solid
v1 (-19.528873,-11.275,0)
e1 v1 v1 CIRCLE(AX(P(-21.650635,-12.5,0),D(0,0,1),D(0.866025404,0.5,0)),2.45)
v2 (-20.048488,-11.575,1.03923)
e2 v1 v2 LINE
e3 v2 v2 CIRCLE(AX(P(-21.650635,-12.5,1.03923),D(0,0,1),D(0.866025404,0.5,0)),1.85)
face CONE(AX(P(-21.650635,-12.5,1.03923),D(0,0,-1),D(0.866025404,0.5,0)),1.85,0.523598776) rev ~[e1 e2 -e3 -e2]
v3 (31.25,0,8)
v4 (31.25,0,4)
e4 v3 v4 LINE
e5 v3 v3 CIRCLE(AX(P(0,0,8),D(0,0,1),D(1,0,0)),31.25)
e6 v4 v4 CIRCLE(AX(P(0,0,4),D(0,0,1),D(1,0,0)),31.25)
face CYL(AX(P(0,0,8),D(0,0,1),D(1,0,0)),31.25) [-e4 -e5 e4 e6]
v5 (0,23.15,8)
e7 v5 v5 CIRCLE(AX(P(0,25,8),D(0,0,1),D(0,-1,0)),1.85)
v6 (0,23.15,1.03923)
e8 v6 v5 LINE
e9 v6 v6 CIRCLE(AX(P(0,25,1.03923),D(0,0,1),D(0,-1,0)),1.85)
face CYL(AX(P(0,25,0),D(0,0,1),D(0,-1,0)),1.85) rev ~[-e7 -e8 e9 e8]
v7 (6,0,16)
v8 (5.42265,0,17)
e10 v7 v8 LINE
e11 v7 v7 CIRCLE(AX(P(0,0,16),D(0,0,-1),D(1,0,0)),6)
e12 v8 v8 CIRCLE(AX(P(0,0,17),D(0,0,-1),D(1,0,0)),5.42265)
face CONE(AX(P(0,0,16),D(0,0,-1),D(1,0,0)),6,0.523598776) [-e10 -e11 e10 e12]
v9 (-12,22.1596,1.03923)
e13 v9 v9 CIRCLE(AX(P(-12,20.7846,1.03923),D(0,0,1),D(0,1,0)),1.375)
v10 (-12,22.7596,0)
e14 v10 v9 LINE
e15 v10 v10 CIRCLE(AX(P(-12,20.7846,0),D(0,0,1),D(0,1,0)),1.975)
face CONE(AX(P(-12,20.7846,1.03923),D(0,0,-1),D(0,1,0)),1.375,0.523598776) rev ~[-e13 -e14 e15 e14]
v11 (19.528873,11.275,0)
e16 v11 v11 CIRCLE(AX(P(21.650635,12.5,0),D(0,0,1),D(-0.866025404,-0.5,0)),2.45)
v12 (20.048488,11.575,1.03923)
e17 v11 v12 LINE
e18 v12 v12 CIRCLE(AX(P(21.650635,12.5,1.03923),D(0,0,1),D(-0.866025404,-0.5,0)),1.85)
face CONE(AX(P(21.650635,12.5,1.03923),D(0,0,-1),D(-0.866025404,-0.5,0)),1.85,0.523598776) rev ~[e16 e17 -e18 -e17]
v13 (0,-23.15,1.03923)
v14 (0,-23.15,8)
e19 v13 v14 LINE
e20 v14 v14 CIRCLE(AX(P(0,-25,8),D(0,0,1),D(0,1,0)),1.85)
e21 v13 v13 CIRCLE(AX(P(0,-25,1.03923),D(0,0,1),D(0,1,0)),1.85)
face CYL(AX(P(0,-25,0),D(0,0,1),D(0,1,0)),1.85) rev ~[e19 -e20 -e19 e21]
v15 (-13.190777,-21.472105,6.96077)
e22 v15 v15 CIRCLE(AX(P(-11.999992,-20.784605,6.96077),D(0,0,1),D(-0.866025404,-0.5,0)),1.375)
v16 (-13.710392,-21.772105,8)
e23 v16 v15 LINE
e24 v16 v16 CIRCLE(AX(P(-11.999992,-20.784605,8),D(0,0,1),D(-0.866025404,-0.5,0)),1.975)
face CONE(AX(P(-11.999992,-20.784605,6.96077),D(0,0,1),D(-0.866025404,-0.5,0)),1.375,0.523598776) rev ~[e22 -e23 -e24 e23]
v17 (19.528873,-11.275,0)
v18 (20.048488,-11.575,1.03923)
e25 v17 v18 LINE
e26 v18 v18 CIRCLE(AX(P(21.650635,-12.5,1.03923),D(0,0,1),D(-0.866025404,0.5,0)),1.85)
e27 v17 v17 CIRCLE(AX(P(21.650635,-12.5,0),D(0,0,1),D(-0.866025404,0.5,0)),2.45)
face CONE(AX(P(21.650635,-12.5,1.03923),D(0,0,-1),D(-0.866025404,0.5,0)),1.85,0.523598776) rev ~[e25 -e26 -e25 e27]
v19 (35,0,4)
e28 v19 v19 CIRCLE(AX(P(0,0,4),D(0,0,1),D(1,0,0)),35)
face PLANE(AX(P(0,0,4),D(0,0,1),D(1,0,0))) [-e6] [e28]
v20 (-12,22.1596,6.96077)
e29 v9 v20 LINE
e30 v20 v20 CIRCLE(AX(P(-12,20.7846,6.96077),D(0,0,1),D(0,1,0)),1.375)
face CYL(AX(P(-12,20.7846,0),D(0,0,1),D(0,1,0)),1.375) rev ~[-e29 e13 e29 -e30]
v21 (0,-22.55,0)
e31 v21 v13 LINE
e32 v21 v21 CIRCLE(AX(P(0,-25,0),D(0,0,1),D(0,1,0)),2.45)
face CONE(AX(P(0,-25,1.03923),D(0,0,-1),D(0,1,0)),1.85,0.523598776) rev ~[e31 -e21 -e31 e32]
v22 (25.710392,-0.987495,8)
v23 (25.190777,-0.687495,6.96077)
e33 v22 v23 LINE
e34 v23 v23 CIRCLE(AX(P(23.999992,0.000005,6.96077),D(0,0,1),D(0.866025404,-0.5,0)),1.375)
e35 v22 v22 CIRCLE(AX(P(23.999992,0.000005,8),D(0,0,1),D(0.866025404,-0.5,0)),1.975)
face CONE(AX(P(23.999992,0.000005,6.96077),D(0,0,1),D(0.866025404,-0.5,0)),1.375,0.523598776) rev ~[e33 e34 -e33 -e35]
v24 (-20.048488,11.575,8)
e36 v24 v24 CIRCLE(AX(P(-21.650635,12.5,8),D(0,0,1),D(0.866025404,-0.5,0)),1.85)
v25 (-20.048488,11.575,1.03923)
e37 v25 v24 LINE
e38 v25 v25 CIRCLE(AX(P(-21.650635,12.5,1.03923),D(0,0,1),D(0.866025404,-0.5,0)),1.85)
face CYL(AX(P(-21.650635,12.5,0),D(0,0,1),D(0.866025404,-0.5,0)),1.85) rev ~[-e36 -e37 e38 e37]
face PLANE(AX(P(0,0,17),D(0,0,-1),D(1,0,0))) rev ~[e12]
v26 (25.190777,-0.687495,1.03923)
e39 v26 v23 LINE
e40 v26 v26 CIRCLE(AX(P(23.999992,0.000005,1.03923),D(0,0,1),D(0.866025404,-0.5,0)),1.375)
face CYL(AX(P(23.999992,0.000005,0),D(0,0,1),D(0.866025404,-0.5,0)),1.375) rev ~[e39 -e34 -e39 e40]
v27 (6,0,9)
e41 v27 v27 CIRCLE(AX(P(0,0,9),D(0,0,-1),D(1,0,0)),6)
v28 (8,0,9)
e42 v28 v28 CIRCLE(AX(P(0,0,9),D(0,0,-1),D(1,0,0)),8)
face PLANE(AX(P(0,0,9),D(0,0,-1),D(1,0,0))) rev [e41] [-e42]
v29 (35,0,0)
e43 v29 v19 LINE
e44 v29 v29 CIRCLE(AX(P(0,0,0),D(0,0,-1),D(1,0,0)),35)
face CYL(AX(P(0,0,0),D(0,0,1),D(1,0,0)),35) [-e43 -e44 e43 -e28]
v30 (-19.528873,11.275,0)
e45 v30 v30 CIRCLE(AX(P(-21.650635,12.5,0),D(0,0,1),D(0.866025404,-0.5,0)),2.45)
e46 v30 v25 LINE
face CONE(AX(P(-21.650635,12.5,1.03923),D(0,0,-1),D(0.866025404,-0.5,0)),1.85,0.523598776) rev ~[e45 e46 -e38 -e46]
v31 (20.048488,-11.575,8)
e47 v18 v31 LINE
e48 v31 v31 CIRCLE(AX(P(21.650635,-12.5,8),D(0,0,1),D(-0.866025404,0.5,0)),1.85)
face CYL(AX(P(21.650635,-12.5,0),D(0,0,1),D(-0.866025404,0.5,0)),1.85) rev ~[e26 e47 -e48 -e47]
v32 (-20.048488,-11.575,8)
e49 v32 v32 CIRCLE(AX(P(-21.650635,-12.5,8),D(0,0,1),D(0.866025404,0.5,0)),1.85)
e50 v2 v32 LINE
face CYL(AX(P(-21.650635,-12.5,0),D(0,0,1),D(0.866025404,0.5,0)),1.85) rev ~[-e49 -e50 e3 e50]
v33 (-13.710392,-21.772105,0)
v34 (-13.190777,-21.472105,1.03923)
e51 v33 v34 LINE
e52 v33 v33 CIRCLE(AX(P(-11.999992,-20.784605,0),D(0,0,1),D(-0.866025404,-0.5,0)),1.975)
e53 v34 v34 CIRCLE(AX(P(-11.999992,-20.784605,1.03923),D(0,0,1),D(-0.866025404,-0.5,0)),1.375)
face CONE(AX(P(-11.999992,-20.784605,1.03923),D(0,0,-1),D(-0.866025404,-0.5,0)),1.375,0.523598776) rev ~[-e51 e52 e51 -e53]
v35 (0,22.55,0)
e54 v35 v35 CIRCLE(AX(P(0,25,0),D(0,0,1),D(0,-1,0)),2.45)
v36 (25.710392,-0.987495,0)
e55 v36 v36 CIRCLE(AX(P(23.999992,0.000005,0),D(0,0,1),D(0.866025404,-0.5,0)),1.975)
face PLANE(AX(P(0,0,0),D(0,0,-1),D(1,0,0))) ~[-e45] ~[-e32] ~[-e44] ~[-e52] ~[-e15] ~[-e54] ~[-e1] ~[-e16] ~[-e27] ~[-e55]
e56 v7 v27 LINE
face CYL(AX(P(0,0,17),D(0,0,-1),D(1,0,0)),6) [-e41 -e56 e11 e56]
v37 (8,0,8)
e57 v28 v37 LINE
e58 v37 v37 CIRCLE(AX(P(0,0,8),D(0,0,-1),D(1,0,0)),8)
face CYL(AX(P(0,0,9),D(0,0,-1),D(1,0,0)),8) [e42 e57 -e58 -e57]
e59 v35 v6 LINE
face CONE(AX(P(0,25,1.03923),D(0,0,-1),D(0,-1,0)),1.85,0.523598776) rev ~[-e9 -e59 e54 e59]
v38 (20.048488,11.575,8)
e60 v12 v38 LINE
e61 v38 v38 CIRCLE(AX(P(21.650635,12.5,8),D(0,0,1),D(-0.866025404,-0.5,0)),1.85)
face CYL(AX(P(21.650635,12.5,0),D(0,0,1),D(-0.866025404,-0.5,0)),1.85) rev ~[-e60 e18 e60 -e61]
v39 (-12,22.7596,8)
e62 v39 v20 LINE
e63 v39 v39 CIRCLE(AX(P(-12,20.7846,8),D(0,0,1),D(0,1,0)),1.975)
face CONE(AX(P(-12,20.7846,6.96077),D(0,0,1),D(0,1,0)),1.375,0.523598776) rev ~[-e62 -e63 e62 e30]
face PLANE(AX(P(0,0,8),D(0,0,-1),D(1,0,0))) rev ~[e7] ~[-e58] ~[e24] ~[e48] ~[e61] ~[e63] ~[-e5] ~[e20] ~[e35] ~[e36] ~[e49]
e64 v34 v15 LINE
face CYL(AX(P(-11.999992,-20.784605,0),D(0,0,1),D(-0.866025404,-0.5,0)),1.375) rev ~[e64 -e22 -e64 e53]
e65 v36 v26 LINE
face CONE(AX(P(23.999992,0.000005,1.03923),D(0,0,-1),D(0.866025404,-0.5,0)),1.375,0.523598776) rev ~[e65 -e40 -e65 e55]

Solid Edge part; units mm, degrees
sketch "Sketch1" plane through (0, 0, 0) normal (0, -1, 0) x (1, 0, 0)
  line L0 (35, 0) -> (35, 8)
  line L1 (35, 8) -> (8, 8)
  line L2 (8, 9) -> (8, 8)
  line L3 (6, 9) -> (8, 9)
  line L4 (6, 17) -> (6, 9)
  line L5 (6, 17) -> (0, 17)
  line L6 (0, 0) -> (35, 0)
  dimension "D1" = 17
  dimension "D2" = 8
  dimension "D3" = 1
revolve "RevolvedProtrusion1" add sketch "Sketch1" angle 360 about axis through (0, 0, 20) along (0, 0, -1)
chamfer "Chamfer_1" distance 1 angle 30 1 edges at (-6, 0, 17) measured on face at (3.3203, -4.9975, 15.5867)
sketch "Sketch2" plane through (0, 0, 8) normal (0, 0, 1) x (1, 0, 0)
  circle A0 centre (0, 0) radius 35
  circle A1 centre (0, 0) radius 31.25
  dimension "D1" = 62.5
extrude "ExtrudedCutout_1" cut sketch "Sketch2" against normal blind 4
hole "Hole_1" at (0, -25, 0) direction (0, 0, 1) diameter 3.7 depth 30 tip angle 118 start chamfer 0.6 start chamfer angle 30
pattern_circular "Pattern1" count 6 over 360 about axis through (0, 0, 0) along (0, 0, 1) of "Hole_1"
hole "Hole_2" at (-12, 20.7846, 0) direction (0, 0, 1) diameter 2.75 depth 20 tip angle 118 start chamfer 0.6 start chamfer angle 30 end chamfer 0.6 end chamfer angle 30
pattern_circular "Pattern2" count 3 over 360 about axis through (0, 0, 0) along (0, 0, 1) of "Hole_2"
properties material "Polyethylene, low density"
